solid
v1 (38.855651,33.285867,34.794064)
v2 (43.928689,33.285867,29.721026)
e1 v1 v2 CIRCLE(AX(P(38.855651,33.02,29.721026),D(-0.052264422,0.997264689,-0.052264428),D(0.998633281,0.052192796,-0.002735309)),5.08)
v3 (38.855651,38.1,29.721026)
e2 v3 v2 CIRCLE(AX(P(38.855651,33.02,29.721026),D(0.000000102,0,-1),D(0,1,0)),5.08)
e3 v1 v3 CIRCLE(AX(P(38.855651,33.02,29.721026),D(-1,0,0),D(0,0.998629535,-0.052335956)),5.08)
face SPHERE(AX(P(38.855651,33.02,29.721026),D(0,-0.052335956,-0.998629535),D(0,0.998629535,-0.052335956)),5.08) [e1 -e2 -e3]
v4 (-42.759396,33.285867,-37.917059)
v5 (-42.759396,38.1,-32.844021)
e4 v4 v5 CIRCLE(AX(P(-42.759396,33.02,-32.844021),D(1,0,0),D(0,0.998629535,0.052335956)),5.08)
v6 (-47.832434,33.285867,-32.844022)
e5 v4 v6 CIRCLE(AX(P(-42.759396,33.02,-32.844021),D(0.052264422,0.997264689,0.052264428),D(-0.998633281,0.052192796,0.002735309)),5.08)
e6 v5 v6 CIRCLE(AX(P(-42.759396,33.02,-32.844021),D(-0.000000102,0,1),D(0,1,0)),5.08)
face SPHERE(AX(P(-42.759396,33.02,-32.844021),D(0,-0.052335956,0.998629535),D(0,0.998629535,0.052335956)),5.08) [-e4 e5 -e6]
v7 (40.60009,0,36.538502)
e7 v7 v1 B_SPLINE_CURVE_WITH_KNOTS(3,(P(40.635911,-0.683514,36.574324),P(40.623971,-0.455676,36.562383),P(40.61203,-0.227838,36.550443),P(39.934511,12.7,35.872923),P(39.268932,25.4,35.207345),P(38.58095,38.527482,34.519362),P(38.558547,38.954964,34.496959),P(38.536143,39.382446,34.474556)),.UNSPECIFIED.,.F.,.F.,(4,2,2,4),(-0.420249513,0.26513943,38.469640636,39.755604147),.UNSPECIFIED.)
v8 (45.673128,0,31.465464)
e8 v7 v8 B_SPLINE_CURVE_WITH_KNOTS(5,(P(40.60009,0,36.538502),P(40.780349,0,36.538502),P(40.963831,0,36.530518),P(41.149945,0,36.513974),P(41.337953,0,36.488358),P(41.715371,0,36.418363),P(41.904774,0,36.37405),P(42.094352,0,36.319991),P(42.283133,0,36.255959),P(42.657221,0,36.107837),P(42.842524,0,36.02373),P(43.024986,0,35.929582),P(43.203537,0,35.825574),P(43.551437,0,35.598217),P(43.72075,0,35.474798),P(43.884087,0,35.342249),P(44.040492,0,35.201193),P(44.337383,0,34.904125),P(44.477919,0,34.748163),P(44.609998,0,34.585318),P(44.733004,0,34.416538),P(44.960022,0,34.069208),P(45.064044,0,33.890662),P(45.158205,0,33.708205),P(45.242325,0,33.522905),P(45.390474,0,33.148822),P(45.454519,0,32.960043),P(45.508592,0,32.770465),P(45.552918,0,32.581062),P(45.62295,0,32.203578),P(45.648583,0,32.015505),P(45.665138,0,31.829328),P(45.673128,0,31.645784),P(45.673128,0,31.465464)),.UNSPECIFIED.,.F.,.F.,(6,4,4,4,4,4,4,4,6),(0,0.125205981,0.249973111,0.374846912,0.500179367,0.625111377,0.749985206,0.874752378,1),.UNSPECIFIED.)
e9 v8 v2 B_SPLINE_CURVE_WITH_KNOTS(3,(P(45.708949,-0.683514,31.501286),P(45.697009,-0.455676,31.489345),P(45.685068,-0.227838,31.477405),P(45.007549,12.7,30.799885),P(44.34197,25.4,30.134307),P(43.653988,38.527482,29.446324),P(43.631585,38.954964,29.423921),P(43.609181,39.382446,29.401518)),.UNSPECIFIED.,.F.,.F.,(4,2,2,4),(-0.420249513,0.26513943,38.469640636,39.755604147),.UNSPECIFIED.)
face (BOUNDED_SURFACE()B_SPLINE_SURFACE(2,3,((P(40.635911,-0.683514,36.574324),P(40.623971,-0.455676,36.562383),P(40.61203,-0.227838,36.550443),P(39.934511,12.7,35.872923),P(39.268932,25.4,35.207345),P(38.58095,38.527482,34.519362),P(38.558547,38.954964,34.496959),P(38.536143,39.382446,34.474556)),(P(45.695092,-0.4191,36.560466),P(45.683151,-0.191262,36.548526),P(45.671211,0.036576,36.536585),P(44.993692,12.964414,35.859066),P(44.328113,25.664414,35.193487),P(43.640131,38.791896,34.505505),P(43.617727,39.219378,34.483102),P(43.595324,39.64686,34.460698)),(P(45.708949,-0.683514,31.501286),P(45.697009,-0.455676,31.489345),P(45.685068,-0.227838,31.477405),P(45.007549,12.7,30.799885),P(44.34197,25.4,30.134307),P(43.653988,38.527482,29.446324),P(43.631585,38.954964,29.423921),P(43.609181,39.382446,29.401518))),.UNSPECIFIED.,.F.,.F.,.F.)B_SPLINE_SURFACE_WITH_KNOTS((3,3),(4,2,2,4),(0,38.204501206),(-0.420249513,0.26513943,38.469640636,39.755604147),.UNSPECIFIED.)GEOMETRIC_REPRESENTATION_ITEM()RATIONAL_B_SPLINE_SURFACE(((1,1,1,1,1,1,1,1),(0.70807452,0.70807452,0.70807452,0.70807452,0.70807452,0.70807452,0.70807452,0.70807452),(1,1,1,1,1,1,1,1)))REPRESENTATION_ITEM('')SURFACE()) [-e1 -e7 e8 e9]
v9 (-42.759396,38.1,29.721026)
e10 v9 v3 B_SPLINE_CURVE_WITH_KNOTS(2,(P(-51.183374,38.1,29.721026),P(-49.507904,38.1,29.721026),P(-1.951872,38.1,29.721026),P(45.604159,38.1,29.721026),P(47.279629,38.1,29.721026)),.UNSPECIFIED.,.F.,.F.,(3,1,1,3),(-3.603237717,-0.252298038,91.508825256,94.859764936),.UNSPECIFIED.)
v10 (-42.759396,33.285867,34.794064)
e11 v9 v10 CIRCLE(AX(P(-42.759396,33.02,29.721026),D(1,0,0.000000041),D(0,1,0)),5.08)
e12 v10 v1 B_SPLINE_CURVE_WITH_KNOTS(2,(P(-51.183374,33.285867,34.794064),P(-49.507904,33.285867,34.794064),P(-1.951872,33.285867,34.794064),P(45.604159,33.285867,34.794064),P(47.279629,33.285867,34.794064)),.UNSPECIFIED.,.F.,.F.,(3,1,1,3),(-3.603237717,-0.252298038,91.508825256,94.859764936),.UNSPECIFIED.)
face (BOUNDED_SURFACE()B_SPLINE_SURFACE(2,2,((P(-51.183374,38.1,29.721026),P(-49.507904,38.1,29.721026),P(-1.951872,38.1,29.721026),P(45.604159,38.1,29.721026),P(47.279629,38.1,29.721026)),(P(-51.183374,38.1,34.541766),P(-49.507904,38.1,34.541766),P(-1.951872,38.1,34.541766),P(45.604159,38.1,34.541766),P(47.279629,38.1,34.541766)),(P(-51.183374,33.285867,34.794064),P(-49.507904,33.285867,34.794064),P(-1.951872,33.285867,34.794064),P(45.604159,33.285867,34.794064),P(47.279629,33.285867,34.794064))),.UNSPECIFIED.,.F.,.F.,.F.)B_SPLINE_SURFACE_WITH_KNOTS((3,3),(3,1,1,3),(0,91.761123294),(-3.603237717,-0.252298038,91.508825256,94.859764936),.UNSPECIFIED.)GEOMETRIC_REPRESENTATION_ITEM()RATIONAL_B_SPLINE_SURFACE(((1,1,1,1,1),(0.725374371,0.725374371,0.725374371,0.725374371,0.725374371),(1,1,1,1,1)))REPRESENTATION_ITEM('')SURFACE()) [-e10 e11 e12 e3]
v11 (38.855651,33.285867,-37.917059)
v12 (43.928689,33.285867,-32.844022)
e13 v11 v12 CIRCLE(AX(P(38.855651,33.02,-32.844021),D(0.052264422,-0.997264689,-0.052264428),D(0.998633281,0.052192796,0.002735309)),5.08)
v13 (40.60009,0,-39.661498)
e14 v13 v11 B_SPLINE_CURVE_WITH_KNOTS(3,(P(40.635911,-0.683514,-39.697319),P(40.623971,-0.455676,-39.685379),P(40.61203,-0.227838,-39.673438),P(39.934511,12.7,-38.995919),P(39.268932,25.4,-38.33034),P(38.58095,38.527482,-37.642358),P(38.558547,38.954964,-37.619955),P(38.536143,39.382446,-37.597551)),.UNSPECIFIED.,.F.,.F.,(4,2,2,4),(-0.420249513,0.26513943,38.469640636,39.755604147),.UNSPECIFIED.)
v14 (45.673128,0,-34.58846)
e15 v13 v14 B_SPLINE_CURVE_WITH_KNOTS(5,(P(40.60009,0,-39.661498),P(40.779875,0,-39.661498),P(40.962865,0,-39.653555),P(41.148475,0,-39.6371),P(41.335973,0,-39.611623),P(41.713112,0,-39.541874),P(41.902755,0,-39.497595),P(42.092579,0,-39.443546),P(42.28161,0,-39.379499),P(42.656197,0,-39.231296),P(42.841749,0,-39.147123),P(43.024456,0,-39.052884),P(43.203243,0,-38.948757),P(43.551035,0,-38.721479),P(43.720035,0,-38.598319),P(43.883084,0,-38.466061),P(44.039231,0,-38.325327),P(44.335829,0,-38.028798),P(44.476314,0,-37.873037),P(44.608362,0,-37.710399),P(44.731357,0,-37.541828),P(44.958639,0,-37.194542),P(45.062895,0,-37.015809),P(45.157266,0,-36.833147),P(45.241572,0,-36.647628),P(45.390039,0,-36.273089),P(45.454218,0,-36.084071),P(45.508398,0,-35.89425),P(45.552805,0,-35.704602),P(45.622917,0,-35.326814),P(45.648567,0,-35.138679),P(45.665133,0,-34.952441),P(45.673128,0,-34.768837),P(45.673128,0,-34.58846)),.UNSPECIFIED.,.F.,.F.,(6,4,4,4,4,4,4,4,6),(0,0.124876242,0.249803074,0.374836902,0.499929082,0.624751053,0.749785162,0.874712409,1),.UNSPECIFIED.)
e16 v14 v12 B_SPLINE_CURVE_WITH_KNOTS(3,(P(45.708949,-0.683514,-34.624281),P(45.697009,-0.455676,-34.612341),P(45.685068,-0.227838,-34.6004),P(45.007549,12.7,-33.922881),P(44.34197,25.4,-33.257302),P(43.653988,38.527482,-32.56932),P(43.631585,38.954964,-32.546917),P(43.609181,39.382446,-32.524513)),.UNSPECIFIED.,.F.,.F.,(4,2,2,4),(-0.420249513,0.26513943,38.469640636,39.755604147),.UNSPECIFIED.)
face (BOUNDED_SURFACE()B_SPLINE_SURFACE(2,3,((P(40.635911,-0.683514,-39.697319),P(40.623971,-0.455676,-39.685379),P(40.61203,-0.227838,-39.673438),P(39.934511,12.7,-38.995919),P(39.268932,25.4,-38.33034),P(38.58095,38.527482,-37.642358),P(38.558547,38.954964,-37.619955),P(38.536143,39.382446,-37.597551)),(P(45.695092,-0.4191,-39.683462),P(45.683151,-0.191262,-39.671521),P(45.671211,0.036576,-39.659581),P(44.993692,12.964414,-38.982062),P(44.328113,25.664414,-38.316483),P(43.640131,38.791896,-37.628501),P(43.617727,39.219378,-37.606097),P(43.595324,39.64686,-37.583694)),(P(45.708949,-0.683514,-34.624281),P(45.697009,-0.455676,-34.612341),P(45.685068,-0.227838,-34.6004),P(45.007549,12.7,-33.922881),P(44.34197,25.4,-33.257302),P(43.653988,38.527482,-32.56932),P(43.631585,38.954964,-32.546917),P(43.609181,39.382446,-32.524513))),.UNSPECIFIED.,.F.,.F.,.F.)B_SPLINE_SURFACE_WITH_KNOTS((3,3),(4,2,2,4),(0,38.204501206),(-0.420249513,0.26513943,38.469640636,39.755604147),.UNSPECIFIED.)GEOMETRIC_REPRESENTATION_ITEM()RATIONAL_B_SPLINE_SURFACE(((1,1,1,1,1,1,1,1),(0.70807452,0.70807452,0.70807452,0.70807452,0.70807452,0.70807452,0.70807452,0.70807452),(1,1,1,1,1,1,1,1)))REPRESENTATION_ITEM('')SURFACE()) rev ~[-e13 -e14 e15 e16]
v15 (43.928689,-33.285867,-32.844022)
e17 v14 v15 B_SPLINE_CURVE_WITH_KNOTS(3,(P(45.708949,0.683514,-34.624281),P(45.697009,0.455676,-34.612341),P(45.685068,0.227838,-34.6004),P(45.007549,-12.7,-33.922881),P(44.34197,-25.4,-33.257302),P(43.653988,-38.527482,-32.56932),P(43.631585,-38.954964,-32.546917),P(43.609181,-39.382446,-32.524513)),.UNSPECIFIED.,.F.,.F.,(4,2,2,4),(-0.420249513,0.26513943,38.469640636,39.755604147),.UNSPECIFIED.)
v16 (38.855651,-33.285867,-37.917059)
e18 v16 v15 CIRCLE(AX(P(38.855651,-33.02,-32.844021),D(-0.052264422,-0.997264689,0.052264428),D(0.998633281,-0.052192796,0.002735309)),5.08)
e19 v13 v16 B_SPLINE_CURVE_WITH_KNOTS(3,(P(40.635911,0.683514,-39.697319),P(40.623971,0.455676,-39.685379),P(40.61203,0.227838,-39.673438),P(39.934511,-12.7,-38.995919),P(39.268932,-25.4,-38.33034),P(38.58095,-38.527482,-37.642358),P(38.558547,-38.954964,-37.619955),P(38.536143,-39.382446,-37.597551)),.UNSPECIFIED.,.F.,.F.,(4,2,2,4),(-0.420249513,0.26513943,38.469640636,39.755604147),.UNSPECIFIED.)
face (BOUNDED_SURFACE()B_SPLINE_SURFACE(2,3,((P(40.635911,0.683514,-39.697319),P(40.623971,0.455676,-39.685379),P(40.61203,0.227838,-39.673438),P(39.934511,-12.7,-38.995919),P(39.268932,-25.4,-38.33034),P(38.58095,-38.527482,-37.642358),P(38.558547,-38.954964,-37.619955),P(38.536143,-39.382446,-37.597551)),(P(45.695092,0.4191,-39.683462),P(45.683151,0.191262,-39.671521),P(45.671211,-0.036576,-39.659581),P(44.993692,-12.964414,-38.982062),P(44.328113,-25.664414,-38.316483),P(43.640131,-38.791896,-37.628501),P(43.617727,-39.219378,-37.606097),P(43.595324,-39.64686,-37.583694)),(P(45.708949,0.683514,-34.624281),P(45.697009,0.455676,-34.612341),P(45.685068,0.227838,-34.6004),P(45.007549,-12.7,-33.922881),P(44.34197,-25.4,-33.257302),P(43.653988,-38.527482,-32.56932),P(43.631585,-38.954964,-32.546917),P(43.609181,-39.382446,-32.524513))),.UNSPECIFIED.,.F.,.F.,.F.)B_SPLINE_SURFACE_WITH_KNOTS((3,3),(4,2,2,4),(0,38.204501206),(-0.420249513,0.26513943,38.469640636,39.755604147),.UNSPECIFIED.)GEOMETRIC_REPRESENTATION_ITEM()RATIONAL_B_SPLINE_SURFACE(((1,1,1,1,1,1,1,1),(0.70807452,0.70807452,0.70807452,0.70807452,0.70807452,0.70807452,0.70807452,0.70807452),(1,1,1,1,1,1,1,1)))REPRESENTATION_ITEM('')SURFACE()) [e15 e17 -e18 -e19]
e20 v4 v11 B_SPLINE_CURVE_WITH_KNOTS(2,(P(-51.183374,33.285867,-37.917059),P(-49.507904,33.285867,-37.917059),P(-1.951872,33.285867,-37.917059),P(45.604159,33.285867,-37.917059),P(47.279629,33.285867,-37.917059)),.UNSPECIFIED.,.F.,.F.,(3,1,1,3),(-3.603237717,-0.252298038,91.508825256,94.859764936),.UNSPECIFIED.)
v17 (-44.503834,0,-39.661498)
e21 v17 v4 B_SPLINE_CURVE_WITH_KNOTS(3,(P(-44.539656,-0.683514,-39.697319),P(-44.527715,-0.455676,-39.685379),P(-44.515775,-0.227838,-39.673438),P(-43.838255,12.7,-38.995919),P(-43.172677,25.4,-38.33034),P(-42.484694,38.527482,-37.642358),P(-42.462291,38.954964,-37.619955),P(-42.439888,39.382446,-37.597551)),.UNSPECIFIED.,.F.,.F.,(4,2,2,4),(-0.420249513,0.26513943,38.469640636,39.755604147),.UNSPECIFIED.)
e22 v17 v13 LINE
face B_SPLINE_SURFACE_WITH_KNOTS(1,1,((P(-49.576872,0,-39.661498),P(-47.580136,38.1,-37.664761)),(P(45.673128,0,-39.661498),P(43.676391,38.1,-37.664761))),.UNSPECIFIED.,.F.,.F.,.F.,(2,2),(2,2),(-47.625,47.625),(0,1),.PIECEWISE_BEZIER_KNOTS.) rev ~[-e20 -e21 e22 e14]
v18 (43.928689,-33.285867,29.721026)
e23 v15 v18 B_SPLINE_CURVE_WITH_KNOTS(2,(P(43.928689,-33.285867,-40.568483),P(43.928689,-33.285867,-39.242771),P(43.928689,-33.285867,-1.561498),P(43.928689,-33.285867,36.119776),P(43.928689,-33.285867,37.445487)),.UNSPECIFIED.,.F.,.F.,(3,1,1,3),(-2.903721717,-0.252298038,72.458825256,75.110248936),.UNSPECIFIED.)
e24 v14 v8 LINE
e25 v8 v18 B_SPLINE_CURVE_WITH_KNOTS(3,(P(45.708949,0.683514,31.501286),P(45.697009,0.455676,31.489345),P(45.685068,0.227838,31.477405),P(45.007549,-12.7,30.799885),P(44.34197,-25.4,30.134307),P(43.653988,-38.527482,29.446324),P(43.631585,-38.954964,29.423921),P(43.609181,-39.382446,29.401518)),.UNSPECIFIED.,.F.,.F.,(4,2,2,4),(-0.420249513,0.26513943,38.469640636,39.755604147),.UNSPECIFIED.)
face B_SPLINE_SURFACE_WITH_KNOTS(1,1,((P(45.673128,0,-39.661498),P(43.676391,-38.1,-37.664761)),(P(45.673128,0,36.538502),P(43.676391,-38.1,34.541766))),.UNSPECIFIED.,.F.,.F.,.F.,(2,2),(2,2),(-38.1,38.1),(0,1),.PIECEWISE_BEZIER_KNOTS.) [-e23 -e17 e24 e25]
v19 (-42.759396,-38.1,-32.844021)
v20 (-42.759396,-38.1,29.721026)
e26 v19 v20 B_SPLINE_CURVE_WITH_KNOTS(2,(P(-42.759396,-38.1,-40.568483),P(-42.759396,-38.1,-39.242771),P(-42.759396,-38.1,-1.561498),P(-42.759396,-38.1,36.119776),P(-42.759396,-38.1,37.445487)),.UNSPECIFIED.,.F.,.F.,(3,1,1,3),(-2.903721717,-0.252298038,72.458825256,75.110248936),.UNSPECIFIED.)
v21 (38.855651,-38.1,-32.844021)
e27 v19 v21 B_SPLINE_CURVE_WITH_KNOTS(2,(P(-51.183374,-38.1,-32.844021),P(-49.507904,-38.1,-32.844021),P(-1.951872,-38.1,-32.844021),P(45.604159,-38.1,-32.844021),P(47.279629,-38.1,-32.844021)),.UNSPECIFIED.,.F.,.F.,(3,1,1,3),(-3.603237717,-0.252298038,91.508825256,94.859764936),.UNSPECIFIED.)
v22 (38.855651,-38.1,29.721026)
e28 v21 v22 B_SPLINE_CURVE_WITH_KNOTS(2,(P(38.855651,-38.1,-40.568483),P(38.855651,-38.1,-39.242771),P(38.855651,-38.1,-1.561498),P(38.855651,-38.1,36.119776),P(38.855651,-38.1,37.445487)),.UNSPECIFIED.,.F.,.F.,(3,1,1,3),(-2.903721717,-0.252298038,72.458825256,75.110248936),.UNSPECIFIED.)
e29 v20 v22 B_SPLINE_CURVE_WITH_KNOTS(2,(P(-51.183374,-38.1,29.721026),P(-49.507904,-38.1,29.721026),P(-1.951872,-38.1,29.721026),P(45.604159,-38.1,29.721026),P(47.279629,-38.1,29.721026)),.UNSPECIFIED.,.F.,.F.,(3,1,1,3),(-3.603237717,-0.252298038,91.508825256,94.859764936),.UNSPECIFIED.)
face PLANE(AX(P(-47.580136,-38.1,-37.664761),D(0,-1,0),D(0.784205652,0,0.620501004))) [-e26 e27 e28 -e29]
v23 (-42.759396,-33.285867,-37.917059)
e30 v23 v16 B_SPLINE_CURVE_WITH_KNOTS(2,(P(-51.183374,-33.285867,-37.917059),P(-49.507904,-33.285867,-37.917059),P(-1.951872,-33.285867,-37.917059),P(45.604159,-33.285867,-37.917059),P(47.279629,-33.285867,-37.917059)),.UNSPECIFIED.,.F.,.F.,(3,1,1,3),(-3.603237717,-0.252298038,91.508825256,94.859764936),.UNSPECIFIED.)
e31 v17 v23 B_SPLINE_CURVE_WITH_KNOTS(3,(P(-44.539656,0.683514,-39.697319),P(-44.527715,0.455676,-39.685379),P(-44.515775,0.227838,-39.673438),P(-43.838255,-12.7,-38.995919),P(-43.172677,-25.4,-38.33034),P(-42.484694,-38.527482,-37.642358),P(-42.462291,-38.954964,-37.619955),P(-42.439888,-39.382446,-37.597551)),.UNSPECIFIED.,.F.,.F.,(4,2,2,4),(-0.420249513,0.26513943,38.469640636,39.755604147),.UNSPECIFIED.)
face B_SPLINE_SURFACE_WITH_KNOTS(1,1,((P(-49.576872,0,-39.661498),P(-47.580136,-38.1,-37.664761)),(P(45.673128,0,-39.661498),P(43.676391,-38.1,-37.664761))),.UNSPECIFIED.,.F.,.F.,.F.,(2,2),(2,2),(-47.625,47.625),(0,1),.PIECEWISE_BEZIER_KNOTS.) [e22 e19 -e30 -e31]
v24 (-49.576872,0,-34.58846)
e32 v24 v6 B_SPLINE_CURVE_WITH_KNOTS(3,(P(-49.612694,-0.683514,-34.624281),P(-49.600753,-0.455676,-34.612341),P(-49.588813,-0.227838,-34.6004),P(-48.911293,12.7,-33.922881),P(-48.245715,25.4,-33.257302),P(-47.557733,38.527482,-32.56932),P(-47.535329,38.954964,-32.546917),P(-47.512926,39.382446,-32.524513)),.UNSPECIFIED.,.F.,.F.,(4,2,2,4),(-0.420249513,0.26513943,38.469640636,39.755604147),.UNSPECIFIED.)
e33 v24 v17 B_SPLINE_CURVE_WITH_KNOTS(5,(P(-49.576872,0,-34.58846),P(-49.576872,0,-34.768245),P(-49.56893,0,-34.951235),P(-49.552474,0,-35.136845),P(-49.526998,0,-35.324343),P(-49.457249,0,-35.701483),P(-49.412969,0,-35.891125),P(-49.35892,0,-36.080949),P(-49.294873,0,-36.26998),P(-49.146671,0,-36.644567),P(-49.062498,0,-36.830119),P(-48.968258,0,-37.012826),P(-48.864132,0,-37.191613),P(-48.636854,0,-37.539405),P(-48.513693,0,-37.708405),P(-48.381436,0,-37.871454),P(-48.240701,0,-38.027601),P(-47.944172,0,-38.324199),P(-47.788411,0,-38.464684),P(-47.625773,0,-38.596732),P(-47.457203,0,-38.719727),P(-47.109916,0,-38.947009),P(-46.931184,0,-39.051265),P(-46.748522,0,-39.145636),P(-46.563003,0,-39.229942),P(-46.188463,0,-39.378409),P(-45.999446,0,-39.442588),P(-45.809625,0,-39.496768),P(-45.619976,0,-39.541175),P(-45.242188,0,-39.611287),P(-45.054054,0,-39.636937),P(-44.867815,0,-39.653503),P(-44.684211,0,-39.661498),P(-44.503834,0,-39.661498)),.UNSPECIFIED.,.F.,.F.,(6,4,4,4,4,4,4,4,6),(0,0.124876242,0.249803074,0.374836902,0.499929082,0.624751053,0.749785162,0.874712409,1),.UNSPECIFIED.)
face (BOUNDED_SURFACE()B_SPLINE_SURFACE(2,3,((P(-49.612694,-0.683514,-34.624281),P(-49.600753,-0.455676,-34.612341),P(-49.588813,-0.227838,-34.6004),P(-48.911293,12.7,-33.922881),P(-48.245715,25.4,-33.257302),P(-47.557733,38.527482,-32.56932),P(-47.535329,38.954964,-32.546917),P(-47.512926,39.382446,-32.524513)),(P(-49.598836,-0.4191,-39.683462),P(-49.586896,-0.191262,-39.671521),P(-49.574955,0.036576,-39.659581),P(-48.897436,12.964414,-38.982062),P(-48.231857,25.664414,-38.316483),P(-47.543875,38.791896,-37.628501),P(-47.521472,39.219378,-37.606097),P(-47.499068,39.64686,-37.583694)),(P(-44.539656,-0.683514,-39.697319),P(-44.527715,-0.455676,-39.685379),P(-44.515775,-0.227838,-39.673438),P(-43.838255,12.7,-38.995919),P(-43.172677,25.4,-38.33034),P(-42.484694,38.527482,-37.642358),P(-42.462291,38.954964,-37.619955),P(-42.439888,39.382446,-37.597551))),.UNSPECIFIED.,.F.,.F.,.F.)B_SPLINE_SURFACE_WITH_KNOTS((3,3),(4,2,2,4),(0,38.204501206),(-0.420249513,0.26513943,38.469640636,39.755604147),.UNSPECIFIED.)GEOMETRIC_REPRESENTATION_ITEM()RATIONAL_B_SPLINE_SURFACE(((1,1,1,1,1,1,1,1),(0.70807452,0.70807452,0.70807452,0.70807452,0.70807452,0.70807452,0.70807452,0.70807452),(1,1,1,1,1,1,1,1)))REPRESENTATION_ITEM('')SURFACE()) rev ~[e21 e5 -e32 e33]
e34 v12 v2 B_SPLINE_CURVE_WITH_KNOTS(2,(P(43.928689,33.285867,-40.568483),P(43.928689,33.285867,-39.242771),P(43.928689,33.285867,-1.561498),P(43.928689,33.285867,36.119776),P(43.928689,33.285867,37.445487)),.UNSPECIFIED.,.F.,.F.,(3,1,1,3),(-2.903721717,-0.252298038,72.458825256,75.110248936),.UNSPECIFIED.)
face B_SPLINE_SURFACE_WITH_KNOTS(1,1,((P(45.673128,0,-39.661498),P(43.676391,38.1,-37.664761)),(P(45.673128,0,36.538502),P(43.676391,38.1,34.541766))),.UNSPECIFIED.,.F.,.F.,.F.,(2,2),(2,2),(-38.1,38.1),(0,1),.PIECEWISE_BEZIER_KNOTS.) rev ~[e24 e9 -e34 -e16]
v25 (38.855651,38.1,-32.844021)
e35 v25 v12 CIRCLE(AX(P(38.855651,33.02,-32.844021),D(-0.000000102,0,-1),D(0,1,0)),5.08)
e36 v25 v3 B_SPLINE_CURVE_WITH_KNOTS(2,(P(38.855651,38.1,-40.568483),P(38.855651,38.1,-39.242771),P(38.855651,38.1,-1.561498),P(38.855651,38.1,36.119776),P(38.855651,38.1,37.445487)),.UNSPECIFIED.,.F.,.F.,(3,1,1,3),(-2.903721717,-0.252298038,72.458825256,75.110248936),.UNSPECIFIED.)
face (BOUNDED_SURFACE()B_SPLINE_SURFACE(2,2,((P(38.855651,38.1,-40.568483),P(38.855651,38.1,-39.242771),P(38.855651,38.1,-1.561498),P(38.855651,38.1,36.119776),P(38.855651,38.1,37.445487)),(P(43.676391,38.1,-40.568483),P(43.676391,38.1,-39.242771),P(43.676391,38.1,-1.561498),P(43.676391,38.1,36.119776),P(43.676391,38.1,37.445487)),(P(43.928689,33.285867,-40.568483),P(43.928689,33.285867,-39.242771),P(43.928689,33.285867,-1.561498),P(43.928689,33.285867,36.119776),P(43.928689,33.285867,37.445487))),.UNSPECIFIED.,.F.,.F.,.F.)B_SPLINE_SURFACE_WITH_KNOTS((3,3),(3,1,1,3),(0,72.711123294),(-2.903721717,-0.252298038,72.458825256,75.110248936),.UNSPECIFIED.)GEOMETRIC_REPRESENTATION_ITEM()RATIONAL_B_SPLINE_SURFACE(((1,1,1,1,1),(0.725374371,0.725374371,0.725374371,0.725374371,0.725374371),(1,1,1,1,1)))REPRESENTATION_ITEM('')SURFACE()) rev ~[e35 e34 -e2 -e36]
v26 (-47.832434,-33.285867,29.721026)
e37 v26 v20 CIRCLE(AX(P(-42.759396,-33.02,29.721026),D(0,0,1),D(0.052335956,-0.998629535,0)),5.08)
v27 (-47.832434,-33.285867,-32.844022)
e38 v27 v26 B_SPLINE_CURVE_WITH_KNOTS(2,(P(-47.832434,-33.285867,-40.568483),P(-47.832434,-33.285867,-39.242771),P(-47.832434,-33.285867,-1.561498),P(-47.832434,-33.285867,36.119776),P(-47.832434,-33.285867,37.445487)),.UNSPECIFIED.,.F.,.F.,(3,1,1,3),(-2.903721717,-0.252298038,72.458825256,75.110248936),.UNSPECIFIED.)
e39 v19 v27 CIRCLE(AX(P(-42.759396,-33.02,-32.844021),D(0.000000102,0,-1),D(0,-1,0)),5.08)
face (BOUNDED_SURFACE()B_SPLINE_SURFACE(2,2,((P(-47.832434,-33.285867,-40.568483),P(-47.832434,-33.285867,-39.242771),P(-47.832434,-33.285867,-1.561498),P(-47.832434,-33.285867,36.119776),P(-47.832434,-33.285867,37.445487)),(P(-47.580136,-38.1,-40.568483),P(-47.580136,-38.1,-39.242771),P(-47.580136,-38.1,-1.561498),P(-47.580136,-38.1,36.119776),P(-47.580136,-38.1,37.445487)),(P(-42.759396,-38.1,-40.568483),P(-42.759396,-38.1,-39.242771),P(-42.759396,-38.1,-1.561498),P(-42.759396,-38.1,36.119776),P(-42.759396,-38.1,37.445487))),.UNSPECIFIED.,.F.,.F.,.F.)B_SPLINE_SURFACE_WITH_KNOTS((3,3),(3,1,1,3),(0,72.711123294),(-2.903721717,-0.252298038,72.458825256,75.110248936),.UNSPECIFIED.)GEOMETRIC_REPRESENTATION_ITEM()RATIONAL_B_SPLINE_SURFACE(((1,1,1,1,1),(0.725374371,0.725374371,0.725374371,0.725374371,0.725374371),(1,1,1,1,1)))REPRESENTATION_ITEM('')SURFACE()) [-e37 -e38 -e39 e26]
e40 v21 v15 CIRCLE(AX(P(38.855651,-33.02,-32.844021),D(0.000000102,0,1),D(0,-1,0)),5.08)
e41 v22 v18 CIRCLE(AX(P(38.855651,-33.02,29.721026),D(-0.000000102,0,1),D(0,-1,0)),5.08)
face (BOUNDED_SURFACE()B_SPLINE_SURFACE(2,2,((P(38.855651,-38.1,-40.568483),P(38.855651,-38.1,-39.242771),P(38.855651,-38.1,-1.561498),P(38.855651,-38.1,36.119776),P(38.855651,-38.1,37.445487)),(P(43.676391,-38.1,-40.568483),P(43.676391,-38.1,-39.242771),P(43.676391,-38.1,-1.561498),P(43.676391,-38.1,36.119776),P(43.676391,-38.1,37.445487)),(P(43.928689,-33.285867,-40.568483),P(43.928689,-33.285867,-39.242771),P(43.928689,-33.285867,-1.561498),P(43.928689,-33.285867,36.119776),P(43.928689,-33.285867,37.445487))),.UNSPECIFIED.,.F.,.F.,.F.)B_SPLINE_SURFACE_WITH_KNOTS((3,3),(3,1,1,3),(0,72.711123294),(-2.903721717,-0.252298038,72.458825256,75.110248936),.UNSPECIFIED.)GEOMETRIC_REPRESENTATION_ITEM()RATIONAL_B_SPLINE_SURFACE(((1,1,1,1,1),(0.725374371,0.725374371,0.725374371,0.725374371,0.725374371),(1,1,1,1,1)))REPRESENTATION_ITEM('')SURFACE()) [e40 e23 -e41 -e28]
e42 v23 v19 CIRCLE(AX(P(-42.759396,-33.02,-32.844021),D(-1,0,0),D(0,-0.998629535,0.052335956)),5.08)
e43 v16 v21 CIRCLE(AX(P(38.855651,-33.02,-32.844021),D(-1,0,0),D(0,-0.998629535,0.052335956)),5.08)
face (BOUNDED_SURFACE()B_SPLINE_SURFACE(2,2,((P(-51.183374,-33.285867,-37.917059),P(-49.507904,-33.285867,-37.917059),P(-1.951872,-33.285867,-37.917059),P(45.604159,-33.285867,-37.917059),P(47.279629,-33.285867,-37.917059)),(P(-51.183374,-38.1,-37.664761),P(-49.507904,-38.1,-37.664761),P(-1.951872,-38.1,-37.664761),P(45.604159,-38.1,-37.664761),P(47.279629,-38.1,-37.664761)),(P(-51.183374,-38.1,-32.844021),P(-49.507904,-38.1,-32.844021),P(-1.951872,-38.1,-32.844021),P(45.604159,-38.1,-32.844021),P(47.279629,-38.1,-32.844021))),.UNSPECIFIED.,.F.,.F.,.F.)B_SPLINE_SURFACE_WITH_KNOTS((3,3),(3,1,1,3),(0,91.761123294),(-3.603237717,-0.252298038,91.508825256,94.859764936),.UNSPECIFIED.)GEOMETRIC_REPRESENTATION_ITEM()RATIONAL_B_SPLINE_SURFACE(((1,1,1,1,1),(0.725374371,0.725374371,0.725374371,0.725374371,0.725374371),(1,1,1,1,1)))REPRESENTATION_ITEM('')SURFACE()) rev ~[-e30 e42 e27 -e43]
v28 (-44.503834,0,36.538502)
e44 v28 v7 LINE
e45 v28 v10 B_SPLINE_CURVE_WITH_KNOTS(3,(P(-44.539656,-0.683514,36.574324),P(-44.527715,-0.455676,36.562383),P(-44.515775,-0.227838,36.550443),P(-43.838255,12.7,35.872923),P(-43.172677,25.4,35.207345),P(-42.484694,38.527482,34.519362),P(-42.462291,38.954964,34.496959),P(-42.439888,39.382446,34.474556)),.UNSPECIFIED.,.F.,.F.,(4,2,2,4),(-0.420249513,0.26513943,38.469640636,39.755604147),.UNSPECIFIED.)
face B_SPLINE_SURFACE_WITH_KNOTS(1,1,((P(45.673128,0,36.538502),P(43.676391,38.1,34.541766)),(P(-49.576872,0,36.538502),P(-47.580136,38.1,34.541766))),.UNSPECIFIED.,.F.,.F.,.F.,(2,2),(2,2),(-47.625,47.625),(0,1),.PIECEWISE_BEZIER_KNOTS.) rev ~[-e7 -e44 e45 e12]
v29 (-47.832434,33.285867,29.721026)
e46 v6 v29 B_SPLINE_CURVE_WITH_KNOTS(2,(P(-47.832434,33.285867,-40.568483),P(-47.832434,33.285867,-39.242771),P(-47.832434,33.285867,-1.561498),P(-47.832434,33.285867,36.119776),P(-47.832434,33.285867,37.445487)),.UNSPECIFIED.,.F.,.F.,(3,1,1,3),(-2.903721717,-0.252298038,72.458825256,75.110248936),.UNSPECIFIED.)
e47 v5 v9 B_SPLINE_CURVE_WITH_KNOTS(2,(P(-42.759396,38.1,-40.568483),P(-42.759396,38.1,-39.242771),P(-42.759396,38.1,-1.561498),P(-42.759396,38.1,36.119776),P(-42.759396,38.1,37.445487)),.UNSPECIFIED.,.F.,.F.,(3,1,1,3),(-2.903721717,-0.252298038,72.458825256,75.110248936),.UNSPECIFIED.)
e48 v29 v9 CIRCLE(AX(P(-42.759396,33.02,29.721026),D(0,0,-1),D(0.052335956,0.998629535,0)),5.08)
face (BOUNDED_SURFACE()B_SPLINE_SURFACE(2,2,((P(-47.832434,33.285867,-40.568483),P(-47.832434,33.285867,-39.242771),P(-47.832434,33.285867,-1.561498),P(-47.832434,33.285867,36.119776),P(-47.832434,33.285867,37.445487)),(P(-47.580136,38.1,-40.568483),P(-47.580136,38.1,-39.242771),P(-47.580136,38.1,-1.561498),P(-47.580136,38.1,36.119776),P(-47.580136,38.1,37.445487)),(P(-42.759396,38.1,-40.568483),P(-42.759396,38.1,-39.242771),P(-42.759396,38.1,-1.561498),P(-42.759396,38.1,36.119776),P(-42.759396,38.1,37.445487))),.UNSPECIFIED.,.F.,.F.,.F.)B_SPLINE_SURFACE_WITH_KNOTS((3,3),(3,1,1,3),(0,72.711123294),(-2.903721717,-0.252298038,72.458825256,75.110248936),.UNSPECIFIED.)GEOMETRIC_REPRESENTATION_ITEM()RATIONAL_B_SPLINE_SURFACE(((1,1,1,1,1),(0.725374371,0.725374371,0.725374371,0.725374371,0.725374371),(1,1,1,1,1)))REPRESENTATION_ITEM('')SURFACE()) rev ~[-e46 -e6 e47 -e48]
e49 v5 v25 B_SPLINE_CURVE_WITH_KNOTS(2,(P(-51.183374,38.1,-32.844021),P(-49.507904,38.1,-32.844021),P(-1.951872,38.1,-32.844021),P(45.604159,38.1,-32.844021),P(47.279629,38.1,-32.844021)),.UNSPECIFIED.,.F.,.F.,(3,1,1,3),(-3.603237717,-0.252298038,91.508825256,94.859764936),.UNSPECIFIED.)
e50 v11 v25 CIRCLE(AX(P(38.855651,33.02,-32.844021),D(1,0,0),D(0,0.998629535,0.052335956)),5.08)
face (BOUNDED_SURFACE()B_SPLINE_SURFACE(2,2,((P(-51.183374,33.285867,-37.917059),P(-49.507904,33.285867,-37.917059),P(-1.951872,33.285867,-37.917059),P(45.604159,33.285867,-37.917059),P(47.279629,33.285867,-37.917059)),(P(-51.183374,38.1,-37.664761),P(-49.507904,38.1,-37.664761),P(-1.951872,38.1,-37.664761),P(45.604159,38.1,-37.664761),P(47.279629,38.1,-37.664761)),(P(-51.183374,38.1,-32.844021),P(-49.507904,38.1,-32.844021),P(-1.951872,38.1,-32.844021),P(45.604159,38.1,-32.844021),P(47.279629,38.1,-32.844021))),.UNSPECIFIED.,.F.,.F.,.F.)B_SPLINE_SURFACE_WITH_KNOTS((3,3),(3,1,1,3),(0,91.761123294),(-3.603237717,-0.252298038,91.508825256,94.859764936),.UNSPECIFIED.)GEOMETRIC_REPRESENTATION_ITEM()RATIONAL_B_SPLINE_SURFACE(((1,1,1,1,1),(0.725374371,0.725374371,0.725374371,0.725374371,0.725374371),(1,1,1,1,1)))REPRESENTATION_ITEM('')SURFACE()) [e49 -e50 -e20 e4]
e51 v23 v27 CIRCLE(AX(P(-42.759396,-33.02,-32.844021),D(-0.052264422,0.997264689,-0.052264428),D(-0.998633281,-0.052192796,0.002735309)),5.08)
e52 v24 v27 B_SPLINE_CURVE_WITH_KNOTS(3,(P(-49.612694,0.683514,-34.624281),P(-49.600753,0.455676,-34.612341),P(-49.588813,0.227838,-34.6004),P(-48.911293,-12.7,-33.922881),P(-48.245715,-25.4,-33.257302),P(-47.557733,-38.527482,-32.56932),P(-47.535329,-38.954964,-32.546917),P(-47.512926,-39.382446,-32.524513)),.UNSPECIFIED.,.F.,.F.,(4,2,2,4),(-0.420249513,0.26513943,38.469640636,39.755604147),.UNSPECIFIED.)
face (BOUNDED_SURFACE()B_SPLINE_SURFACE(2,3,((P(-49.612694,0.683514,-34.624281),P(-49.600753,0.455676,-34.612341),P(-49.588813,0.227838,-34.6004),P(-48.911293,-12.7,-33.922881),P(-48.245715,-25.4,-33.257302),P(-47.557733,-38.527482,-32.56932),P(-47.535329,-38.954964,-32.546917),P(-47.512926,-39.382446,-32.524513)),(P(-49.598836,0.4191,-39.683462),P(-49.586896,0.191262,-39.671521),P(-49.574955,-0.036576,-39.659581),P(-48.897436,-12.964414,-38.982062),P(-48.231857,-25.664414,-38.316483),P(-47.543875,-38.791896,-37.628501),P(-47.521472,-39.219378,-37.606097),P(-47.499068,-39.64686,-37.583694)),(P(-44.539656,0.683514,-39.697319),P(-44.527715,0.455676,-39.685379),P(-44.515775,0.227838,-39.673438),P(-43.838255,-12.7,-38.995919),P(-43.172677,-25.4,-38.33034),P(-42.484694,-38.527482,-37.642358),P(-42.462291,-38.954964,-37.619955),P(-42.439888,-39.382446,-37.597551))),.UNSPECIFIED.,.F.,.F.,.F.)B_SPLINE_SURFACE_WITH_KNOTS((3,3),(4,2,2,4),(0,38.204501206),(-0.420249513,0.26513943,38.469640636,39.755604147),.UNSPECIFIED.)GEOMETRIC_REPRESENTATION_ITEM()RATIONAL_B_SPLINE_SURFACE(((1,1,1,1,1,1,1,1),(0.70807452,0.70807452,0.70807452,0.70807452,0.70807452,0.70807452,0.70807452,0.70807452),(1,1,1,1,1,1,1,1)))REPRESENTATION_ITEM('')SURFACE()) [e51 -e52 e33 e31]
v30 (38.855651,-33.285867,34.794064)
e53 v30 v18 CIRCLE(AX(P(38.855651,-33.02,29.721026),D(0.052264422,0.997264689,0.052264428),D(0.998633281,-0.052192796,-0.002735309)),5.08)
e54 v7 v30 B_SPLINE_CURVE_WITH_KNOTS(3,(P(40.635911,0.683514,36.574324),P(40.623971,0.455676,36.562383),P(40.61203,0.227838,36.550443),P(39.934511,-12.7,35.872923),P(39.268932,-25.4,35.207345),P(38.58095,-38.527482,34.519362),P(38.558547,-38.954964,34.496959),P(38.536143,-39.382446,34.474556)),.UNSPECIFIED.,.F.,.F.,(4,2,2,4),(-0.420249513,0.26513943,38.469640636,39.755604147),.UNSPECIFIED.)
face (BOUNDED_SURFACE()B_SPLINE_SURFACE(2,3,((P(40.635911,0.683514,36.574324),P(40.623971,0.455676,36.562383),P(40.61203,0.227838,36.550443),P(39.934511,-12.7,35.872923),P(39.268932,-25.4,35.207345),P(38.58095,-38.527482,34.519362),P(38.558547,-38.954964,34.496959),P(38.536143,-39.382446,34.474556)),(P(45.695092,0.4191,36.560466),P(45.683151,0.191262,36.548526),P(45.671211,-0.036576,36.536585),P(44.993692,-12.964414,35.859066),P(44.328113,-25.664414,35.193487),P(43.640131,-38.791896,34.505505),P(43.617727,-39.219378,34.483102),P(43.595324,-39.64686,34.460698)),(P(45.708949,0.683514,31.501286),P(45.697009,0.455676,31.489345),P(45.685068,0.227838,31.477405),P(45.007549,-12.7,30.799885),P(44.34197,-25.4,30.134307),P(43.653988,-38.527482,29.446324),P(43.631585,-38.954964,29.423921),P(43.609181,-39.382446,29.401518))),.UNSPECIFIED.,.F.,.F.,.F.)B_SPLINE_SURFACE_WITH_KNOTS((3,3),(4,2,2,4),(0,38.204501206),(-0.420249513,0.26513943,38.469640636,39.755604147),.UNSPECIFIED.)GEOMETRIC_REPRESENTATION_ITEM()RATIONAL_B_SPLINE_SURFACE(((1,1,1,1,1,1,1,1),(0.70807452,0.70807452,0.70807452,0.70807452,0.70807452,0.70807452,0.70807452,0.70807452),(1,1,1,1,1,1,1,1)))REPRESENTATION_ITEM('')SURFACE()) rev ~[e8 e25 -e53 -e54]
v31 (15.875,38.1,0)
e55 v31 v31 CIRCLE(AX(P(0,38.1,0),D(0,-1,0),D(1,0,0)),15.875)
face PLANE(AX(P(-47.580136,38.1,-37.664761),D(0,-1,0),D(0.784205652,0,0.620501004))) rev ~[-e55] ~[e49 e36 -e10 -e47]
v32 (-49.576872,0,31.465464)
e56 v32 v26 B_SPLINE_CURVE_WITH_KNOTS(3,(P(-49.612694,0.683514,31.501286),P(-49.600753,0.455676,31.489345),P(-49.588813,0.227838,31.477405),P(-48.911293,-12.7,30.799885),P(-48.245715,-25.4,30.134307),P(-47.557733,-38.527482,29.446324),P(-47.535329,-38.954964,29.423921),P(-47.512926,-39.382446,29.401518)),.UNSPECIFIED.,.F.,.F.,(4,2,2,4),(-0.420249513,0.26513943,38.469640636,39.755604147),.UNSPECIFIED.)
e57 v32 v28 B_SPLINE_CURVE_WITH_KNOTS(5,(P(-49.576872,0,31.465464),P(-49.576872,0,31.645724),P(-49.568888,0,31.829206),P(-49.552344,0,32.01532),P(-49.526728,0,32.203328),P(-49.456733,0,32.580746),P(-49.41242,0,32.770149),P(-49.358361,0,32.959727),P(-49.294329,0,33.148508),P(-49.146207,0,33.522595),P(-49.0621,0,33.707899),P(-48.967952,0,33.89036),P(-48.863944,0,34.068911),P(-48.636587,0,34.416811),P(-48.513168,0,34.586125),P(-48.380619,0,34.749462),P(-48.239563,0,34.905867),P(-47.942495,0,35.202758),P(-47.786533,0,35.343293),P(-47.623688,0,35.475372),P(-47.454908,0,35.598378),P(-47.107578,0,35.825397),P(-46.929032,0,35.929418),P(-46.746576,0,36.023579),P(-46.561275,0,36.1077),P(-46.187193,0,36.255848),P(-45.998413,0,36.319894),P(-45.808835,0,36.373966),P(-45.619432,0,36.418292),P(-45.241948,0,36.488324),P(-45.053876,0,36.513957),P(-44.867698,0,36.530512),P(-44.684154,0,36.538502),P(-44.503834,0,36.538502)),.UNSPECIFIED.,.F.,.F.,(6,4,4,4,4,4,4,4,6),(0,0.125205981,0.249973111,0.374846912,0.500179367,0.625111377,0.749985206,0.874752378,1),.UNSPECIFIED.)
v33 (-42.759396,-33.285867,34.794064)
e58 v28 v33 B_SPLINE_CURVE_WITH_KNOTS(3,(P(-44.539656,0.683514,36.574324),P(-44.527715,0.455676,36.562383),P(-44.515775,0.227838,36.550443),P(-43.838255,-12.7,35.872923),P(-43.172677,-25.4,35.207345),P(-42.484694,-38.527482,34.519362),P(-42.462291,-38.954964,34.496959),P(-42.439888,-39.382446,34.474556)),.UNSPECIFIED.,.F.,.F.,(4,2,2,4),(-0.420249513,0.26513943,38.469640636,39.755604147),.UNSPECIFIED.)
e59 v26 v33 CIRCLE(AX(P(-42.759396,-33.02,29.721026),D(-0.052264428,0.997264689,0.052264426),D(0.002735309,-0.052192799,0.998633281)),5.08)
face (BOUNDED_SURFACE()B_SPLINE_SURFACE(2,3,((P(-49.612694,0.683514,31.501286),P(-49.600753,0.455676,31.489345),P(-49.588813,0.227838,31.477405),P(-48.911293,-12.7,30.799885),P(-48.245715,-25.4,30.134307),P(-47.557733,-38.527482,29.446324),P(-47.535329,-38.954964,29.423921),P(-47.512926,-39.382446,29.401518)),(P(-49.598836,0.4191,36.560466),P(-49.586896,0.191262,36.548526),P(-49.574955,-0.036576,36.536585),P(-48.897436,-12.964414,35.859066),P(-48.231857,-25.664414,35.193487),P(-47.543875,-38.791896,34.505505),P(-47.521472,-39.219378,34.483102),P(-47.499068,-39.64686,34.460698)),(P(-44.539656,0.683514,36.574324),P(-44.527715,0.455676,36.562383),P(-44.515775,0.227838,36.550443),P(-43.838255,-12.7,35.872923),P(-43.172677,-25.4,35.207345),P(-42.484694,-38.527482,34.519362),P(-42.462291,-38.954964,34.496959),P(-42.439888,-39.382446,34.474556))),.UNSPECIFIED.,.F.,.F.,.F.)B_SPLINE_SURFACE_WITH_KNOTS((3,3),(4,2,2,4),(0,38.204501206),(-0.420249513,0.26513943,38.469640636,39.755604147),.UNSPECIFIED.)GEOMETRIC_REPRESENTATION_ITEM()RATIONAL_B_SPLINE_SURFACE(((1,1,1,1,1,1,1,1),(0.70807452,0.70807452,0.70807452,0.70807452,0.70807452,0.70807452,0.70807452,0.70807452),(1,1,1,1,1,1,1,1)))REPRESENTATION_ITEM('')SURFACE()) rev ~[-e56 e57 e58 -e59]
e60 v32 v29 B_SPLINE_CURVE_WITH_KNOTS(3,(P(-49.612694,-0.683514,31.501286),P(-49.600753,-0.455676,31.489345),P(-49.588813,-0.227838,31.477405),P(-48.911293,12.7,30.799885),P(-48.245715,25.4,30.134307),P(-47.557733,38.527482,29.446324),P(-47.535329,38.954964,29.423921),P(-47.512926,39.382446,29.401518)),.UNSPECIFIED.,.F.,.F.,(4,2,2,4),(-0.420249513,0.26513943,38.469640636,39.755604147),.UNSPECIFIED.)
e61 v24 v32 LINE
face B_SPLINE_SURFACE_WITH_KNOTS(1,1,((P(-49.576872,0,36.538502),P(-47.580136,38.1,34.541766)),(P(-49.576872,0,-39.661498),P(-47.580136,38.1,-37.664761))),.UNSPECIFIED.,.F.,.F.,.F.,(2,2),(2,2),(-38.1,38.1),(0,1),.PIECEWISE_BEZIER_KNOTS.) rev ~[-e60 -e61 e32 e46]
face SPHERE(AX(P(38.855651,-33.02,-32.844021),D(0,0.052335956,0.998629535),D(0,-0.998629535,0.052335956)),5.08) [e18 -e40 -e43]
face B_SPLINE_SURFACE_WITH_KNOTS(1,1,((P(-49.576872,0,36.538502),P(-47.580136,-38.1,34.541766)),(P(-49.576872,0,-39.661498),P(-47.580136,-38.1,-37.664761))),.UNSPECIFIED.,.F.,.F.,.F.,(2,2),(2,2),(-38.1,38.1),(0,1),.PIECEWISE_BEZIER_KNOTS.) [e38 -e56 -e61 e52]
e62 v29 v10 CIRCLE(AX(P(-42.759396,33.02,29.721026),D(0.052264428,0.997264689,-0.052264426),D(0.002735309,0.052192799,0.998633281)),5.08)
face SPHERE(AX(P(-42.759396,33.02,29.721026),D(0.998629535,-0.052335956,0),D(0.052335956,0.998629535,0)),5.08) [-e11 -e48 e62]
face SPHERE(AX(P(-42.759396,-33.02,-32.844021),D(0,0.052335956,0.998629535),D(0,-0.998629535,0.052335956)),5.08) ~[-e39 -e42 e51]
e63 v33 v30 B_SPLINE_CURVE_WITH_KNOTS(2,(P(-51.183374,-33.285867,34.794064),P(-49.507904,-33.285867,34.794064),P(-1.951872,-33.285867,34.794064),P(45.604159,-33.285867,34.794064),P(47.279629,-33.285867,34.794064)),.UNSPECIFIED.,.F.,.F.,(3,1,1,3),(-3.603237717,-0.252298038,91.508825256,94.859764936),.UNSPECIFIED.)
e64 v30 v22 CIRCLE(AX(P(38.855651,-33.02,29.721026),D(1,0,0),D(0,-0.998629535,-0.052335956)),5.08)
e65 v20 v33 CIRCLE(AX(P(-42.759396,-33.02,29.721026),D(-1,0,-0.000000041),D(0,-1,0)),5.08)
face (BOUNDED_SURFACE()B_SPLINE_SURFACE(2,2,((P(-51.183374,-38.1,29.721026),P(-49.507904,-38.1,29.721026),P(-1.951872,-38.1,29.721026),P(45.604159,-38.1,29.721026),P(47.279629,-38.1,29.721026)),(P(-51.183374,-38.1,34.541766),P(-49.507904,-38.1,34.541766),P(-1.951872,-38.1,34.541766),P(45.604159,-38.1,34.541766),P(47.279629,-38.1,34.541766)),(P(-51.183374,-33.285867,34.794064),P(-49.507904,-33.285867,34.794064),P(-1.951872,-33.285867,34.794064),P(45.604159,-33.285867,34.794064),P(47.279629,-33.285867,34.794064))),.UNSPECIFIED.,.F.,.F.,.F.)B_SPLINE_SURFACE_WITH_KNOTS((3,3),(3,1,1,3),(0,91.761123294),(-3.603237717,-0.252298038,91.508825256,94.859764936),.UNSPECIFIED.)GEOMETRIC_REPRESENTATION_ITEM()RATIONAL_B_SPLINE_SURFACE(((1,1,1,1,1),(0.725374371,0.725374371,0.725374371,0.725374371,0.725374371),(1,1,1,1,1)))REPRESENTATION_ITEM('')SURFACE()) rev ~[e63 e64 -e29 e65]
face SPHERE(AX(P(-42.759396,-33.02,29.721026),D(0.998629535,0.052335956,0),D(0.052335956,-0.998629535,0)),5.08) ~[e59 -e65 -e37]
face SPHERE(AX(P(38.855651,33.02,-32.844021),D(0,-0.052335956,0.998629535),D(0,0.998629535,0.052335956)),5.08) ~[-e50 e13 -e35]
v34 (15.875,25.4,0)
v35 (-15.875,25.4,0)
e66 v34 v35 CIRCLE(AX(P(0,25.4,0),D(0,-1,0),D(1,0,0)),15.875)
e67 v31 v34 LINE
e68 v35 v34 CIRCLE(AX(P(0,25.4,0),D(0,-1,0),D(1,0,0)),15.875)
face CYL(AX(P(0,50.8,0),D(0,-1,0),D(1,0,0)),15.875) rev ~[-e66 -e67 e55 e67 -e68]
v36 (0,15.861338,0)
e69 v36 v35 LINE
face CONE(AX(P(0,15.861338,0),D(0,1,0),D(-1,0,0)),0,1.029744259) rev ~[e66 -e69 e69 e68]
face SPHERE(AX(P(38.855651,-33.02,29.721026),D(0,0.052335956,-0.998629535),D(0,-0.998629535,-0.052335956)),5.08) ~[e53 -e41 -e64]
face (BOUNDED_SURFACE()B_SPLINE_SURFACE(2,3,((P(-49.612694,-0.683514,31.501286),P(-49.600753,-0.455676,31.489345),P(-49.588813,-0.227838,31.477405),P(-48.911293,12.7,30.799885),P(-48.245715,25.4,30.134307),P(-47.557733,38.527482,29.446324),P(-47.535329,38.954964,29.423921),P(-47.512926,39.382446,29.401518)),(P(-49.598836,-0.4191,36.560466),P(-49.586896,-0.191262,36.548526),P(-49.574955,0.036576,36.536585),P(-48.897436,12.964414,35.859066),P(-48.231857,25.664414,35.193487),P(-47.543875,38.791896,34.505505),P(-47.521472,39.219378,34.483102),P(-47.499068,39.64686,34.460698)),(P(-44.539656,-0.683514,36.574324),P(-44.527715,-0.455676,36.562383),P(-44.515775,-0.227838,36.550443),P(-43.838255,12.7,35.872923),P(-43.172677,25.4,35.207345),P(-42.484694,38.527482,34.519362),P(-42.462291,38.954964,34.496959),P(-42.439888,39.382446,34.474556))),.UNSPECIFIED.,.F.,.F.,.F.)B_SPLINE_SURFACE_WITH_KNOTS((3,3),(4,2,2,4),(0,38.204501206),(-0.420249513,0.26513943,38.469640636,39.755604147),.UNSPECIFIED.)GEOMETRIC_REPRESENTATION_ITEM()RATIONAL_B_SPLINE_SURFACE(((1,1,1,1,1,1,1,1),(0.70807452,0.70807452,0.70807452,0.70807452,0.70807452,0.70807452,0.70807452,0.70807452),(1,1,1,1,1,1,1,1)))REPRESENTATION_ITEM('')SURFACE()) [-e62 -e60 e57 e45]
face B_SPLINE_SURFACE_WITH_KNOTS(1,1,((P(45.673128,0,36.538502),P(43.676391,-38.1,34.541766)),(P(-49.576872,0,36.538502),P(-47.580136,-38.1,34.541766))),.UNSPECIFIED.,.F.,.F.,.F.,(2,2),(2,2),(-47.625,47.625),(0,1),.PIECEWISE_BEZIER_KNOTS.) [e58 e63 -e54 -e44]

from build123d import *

# Parameters (mm, degrees)
F0_W     = 95.25
F0_H     = 76.2
F1_DEPTH = 38.1
F1_TAPER = 3
F2_R     = 5.08
F4_D     = 31.75
F4_DEPTH = 12.7
F4_TIP   = 9.5386623271


with BuildPart() as f1:
    # F0 (on Front) → F1 (new body, symmetric)
    with BuildSketch(Plane.XZ):
        with Locations((-1.951872288, -1.5614978304)):
            Rectangle(F0_W, F0_H)
    extrude(amount=F1_DEPTH, both=True, taper=F1_TAPER)

    # F2
    f2_edges = [f1.edges().sort_by_distance(p)[0] for p in [
        (43.676391, -38.1, -1.561498),
        (-1.951872, -38.1, 34.541766),
        (-47.580136, -38.1, -1.561498),
        (-1.951872, -38.1, -37.664761),
        (43.676391, 38.1, -1.561498),
        (-1.951872, 38.1, 34.541766),
        (-47.580136, 38.1, -1.561498),
        (-1.951872, 38.1, -37.664761),
        (44.67476, -19.05, 35.540134),
        (44.67476, -19.05, -38.66313),
        (44.67476, 19.05, 35.540134),
        (44.67476, 19.05, -38.66313),
        (-48.578504, -19.05, 35.540134),
        (-48.578504, -19.05, -38.66313),
        (-48.578504, 19.05, 35.540134),
        (-48.578504, 19.05, -38.66313),
    ]]
    fillet(f2_edges, radius=F2_R)

    # F4
    with Locations(Plane(origin=(0, 38.1, 0), x_dir=(-1, 0, 0), z_dir=(0, 1, 0))):
        with Locations((0, 0)):
            Hole(F4_D / 2, depth=F4_DEPTH)
            with Locations((0, 0, -(F4_DEPTH + F4_TIP / 2))):  # 118° drill point
                Cone(0, F4_D / 2, F4_TIP, mode=Mode.SUBTRACT)


solid = f1.part
